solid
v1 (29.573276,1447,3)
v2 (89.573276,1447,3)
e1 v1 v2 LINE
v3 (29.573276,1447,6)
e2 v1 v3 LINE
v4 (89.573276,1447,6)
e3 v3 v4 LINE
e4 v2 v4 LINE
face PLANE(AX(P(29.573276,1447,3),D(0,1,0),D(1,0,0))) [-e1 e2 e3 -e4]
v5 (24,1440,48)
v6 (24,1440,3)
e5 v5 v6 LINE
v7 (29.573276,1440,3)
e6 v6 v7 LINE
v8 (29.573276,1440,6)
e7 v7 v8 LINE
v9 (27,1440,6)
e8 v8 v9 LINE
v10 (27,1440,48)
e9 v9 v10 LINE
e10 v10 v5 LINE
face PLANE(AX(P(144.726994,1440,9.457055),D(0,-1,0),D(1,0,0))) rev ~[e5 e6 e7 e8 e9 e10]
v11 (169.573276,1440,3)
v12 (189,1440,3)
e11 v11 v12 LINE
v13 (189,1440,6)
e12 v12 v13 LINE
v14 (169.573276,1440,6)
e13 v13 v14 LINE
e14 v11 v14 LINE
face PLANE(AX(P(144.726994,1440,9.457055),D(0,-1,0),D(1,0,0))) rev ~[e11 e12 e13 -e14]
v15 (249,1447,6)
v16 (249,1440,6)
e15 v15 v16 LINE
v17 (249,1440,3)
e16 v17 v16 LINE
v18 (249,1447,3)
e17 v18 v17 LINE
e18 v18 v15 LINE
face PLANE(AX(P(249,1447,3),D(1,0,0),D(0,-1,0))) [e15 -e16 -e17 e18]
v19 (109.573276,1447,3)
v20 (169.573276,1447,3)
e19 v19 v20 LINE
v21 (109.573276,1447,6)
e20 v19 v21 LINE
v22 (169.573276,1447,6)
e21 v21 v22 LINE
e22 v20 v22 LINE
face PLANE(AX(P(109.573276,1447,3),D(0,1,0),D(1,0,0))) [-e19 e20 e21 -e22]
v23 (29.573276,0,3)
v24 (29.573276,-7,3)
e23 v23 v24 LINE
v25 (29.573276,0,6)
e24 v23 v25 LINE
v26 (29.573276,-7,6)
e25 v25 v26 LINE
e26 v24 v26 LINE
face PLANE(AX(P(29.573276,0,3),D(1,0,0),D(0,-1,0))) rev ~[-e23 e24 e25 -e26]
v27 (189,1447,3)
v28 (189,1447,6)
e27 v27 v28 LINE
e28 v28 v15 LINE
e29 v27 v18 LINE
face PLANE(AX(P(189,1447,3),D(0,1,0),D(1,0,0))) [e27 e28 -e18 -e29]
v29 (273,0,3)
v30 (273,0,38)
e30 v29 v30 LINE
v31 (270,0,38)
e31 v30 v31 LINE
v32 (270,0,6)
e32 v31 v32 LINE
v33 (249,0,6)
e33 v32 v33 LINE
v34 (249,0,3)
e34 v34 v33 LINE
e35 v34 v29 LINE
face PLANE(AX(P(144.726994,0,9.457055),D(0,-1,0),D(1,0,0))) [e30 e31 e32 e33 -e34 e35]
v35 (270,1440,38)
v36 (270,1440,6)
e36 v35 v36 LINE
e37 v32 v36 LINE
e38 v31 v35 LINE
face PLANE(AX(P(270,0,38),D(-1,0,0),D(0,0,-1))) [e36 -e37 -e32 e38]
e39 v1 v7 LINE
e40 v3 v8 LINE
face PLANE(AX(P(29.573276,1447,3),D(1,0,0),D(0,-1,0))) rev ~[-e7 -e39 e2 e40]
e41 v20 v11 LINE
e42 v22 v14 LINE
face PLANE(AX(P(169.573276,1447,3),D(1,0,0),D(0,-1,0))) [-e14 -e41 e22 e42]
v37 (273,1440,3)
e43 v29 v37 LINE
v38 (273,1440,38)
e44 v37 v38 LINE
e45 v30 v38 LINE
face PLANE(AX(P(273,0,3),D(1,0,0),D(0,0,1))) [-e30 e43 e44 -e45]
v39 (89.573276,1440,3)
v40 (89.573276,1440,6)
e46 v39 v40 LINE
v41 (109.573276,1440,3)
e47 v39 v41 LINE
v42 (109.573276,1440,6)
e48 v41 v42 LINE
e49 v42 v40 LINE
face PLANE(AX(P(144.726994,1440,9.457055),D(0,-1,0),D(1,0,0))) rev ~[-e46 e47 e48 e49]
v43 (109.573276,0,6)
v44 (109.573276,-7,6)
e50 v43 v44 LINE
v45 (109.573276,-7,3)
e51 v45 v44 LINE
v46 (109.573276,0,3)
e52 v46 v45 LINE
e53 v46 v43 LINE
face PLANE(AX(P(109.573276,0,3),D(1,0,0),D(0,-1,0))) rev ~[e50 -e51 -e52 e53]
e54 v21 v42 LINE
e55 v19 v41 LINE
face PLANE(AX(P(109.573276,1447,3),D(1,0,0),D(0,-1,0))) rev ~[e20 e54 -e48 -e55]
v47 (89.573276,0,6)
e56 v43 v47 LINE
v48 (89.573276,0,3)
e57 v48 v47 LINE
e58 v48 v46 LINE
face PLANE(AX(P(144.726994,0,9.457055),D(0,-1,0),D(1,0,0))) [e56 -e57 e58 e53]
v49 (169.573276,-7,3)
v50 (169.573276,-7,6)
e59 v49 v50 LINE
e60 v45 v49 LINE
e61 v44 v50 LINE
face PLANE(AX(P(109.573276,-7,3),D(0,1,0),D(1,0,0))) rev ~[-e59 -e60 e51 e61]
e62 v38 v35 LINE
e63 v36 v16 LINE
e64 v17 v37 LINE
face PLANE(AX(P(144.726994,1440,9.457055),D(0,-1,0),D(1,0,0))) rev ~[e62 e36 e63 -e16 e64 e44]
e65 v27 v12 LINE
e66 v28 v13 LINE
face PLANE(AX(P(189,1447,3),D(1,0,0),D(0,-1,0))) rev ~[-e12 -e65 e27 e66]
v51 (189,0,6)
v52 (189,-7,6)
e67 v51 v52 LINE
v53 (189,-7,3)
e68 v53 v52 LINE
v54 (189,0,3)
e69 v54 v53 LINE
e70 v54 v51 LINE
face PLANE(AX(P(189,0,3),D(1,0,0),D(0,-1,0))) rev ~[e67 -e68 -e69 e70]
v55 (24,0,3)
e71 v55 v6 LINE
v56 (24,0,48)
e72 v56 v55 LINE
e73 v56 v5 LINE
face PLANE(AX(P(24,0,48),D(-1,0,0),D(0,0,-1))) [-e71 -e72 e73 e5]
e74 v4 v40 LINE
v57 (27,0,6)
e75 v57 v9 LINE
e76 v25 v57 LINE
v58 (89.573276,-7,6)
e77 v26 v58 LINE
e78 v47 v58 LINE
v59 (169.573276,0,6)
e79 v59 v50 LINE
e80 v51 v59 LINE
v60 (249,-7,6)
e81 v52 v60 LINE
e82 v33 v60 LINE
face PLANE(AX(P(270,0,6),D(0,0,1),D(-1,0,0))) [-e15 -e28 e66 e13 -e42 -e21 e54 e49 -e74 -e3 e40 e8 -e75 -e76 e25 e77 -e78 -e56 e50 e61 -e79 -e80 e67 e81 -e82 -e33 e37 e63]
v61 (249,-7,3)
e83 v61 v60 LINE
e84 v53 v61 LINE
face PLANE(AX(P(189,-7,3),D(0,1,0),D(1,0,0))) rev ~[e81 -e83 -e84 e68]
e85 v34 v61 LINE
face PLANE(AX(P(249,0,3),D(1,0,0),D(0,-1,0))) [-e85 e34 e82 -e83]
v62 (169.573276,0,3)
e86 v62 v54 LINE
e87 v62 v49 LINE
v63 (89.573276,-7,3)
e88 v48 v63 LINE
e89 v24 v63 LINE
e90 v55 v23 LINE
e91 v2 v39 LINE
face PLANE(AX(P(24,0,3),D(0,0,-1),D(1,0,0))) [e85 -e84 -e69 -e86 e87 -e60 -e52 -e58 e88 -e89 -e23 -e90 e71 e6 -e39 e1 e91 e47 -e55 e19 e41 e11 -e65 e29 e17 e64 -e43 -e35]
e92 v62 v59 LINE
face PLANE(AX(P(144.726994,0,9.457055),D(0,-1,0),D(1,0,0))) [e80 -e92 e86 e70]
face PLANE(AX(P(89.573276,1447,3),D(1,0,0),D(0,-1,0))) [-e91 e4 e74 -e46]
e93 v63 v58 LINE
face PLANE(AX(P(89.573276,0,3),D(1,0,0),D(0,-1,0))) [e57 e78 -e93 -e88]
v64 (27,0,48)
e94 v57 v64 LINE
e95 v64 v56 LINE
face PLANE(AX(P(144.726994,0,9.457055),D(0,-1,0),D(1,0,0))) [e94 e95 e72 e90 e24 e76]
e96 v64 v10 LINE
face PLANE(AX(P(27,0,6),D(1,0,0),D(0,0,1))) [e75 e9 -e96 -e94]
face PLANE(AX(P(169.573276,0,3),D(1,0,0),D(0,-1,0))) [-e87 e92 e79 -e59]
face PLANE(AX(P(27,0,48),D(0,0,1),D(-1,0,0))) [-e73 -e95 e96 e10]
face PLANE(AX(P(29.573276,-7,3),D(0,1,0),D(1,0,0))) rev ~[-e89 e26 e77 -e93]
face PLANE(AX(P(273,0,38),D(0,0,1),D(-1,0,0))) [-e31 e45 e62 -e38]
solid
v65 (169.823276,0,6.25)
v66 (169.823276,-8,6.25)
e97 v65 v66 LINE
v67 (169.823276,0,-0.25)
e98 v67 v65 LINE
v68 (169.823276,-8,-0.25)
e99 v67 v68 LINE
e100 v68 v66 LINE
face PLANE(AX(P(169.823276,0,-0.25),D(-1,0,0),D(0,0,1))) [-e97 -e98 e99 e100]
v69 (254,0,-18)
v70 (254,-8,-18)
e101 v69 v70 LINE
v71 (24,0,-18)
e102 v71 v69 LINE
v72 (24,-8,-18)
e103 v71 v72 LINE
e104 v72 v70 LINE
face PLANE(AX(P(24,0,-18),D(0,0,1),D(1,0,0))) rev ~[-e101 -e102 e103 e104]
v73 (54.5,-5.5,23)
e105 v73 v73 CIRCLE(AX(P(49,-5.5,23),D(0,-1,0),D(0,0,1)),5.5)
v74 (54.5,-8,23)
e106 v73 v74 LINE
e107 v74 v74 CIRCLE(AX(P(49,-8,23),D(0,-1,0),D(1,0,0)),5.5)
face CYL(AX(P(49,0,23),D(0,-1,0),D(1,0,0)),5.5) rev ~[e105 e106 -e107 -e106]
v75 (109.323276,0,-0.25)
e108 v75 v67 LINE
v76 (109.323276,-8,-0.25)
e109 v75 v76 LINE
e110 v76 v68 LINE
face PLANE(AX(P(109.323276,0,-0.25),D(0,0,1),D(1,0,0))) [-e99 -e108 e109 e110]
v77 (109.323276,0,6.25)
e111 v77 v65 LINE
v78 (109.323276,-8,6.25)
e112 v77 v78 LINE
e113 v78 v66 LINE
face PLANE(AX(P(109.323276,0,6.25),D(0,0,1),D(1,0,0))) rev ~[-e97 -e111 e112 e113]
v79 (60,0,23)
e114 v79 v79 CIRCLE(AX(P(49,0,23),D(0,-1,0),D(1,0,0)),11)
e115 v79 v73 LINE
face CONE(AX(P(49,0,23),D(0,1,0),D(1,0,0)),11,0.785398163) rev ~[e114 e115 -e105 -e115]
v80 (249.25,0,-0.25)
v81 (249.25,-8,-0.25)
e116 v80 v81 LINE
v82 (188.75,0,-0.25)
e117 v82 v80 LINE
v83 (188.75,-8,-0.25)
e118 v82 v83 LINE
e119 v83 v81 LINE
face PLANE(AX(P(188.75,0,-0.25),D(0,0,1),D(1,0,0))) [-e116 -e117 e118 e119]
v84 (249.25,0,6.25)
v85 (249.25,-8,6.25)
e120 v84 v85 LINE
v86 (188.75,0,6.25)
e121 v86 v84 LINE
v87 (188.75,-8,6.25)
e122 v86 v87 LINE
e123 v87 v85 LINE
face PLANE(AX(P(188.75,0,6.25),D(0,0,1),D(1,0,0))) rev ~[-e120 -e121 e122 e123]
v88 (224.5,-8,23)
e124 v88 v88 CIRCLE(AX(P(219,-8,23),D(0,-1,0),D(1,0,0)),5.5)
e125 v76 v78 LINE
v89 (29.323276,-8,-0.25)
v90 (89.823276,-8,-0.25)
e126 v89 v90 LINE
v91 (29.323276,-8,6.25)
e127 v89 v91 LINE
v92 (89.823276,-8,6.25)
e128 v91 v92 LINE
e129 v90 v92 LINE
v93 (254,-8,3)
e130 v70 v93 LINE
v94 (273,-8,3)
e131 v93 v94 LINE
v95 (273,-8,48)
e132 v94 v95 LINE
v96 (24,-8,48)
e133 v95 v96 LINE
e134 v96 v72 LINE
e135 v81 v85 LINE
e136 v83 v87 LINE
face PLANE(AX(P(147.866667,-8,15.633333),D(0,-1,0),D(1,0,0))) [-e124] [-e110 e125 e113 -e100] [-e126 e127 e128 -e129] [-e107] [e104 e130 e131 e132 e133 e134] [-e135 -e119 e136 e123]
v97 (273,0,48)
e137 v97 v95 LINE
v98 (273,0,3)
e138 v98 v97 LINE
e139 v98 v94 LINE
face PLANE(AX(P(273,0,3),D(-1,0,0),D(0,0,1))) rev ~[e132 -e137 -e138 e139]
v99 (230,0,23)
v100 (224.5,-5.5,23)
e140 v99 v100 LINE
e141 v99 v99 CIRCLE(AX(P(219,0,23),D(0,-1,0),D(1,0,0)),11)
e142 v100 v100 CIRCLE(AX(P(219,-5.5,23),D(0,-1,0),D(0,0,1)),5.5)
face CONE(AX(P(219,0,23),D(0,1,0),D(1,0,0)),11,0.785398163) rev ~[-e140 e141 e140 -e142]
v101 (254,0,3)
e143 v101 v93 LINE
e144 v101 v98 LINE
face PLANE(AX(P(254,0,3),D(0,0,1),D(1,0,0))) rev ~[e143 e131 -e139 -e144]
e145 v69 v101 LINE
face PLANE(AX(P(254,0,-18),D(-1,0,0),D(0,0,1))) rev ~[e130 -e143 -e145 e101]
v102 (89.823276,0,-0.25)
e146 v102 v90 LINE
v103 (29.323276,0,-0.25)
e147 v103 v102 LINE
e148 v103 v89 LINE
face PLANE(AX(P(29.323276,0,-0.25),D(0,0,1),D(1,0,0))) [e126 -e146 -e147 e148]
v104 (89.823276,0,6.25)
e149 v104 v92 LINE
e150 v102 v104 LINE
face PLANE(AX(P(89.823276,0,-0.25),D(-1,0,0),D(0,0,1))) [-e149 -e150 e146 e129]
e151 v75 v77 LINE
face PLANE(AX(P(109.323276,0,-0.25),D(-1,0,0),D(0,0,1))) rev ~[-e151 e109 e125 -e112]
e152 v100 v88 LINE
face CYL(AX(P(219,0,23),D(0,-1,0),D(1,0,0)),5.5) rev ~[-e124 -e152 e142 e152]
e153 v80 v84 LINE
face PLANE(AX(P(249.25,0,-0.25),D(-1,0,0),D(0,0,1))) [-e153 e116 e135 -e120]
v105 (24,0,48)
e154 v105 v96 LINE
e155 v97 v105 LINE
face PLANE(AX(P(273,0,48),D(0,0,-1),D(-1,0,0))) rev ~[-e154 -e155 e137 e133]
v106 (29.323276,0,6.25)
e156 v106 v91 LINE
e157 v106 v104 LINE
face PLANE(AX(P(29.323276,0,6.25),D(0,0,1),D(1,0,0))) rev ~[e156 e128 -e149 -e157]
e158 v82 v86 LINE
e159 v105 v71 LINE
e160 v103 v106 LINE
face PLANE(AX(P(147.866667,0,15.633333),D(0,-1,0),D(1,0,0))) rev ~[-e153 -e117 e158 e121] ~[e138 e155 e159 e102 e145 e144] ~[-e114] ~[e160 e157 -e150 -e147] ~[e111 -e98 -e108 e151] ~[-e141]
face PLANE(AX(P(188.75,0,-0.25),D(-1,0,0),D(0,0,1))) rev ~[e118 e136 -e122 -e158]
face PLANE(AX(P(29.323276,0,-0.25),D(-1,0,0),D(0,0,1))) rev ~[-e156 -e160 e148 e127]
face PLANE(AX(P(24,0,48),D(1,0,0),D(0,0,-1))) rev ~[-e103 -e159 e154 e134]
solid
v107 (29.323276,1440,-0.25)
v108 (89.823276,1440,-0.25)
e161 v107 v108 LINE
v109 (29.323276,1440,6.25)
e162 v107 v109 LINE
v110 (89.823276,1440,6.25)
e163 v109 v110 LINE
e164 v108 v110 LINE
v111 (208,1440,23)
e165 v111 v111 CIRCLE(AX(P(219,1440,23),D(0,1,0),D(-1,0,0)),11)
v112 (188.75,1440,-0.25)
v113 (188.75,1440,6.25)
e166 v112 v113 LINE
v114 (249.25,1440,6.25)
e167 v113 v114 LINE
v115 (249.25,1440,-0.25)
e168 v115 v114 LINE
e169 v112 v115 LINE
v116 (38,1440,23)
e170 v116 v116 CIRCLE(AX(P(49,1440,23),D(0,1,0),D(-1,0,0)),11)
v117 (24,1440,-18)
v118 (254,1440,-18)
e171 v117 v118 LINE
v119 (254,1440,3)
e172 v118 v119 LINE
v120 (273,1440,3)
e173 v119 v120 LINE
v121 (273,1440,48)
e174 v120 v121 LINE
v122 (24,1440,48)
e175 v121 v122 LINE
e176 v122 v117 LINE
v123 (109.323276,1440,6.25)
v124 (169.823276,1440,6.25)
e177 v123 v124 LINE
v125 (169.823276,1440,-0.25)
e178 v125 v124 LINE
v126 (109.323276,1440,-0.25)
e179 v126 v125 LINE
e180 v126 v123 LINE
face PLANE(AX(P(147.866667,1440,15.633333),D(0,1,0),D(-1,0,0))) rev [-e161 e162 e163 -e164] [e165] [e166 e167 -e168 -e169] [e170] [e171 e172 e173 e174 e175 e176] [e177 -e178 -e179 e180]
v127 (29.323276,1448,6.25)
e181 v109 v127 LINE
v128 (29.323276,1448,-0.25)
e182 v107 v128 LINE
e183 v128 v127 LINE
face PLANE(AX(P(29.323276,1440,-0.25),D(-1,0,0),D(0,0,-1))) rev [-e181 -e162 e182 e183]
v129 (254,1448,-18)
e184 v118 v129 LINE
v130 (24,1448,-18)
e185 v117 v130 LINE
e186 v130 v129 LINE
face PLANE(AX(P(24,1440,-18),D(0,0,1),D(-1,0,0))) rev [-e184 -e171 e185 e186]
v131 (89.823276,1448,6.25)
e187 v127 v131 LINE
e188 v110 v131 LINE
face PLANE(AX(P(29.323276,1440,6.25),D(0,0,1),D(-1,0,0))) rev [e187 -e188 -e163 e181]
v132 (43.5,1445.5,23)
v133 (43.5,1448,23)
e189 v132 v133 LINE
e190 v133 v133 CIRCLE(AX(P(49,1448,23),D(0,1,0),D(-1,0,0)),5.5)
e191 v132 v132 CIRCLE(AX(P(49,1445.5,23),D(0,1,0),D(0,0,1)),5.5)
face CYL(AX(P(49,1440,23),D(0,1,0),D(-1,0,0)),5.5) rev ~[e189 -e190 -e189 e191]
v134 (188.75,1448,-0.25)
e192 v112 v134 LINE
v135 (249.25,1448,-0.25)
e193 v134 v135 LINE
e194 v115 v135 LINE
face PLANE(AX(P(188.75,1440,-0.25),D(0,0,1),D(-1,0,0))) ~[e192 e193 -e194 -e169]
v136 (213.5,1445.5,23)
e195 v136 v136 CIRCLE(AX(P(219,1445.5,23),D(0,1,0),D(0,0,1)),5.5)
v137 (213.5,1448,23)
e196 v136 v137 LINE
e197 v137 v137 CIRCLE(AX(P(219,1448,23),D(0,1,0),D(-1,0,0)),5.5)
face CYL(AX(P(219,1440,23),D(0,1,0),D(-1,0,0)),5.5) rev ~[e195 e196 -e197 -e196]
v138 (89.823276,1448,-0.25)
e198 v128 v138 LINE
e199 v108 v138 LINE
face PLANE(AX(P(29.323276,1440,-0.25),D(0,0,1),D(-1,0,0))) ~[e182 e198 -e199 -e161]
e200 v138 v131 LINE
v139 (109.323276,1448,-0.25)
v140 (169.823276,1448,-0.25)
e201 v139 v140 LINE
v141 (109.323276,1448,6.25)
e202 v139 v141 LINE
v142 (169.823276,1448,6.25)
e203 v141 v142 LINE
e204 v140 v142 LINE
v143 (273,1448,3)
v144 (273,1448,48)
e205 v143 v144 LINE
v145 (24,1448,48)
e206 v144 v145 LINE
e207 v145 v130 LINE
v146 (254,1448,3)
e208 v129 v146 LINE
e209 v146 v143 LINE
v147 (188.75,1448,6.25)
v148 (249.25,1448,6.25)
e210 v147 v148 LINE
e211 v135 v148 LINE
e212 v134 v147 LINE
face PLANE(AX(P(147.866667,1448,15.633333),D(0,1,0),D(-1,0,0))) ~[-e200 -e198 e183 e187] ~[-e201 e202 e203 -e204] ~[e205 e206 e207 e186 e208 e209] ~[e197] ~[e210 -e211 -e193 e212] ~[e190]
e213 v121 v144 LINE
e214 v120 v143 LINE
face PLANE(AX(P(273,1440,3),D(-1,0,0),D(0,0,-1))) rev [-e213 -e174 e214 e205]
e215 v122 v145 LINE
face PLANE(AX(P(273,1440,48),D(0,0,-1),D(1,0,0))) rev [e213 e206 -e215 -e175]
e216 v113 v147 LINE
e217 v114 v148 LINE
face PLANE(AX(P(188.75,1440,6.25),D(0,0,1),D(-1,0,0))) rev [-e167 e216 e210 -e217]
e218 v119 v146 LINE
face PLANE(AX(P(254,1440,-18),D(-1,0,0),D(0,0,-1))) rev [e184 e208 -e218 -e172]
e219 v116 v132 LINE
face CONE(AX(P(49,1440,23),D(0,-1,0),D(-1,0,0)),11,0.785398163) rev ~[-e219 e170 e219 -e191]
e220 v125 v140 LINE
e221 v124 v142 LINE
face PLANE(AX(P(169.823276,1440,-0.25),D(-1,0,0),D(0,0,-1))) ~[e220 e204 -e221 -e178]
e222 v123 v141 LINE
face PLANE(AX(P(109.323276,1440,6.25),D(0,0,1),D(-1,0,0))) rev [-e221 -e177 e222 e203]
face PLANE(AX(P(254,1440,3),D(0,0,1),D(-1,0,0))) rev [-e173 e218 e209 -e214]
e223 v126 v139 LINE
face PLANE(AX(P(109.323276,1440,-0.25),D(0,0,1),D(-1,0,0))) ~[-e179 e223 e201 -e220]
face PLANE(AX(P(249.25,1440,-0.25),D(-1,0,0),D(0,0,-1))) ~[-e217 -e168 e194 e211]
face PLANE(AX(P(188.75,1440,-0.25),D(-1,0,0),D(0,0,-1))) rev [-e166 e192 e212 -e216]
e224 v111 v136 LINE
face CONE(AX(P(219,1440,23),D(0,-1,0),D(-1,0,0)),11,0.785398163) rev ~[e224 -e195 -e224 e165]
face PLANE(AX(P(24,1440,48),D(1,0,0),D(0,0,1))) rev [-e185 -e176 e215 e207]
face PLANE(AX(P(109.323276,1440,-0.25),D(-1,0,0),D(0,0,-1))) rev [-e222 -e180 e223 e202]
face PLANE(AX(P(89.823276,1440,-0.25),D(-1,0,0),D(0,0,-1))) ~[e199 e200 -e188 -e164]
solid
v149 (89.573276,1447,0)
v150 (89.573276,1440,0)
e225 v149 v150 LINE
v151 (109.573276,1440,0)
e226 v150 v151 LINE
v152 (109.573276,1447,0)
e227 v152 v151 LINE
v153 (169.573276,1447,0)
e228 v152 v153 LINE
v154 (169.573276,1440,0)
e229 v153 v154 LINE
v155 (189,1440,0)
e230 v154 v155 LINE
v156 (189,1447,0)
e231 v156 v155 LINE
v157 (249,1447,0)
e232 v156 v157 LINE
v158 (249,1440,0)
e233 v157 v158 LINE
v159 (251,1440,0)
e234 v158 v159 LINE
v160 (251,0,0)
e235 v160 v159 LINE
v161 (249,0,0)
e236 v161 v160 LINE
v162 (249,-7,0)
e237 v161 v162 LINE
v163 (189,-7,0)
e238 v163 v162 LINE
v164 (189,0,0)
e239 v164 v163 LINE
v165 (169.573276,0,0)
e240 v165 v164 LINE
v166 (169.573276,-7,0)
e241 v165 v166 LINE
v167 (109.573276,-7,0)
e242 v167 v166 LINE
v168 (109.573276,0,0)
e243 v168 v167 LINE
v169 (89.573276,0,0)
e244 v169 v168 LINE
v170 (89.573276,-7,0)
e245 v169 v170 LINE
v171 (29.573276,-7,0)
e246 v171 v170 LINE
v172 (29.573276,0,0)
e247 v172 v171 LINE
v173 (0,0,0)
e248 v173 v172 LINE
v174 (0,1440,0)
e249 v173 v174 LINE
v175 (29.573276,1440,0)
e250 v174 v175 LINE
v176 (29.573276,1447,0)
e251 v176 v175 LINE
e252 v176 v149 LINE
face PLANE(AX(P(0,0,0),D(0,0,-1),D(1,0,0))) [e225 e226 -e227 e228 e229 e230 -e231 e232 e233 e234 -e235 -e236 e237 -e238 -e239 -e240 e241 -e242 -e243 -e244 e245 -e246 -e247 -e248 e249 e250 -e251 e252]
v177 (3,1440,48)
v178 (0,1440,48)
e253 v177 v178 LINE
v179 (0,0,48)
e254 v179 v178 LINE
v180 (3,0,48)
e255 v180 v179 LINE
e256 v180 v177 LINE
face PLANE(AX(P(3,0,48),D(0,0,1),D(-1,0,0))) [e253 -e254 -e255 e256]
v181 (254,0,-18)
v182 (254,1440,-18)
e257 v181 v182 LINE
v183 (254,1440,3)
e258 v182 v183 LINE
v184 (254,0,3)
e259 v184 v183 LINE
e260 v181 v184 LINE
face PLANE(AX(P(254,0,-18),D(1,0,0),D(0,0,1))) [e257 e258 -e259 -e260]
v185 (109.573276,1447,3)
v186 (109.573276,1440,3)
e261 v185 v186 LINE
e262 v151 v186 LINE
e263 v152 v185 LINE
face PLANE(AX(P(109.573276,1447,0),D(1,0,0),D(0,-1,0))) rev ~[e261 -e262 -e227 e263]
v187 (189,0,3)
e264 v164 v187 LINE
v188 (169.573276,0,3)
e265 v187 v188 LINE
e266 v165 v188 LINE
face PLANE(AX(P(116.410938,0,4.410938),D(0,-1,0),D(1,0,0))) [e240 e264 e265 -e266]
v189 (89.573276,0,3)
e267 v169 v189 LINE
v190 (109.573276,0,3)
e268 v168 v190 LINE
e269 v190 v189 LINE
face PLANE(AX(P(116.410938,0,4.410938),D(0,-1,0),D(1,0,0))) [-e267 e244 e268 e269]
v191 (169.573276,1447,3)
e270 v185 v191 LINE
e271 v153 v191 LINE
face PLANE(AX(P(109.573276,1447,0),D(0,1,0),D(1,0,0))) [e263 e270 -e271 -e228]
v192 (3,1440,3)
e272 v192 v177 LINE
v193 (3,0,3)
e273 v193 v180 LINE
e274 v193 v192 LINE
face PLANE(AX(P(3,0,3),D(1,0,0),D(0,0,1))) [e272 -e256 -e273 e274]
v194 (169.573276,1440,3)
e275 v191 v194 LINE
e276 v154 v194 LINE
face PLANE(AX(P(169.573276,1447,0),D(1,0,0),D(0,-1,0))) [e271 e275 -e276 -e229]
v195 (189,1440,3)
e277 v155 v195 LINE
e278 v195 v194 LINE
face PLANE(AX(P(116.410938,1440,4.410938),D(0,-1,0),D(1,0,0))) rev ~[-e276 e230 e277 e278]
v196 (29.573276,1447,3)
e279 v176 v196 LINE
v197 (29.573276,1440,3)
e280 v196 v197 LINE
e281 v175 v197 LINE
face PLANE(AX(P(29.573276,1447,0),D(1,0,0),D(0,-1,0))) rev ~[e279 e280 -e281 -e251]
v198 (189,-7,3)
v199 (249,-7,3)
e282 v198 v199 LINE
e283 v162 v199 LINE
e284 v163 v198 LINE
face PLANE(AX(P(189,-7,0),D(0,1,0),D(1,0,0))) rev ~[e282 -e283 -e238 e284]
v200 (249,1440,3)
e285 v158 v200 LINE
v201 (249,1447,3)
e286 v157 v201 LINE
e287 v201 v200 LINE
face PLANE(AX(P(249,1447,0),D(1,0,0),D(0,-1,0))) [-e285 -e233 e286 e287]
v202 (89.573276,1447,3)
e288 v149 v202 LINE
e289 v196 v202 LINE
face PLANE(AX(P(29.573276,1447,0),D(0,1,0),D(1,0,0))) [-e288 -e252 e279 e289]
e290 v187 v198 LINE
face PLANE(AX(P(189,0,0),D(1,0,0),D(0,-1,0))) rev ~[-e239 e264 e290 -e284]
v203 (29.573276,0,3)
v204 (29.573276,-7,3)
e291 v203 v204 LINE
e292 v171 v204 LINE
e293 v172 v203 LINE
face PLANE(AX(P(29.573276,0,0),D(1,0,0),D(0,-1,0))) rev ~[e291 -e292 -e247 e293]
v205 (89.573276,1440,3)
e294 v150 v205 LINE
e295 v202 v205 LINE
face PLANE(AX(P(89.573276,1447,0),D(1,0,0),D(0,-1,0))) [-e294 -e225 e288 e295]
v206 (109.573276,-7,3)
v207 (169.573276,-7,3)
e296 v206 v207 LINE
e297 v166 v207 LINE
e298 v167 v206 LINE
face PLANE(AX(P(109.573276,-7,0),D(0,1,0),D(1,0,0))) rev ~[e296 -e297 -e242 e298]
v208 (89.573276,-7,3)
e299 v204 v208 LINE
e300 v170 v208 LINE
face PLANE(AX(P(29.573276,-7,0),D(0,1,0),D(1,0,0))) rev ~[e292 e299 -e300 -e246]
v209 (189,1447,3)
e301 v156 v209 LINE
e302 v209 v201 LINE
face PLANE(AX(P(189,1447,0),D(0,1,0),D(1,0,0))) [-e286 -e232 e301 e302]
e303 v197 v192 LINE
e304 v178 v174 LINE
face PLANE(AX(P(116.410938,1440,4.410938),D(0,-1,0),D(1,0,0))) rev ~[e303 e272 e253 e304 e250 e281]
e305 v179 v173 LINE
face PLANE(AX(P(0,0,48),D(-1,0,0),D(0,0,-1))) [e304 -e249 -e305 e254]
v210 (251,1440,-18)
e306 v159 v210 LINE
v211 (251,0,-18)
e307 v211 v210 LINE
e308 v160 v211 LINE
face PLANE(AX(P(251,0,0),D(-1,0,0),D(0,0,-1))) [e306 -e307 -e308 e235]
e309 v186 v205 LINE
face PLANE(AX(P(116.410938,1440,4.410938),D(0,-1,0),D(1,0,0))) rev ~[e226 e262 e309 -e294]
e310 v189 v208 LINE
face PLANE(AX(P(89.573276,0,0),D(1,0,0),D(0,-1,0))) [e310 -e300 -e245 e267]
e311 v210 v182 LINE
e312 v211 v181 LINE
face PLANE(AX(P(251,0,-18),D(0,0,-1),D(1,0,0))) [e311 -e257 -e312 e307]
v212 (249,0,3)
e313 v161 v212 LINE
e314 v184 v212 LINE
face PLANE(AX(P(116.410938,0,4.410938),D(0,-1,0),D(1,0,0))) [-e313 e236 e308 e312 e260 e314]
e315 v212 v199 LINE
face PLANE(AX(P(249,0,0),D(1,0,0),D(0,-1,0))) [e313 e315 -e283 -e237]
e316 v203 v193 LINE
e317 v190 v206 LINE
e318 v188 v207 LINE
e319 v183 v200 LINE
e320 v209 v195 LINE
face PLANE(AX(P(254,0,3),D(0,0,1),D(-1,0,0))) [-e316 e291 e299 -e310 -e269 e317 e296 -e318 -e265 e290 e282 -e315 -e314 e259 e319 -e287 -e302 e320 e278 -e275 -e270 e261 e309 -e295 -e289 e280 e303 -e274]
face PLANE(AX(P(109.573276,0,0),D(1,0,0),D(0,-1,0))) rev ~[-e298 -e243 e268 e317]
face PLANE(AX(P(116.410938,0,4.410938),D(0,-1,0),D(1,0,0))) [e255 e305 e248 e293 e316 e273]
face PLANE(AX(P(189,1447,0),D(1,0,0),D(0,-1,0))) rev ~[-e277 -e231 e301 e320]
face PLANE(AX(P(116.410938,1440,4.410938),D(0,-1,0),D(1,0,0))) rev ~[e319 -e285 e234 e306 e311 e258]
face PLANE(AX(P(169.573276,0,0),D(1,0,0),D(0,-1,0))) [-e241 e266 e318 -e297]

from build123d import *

# Parameters (mm, degrees)
F1_DEPTH        = 1440
F2_DEPTH        = 1440
F3_W            = 60
F3_H            = 7
F4_DEPTH        = 3
F6_W            = 60
F6_H            = 7
F7_DEPTH        = 3
F8_W            = 60.5
F8_H            = 6.5
F9_DEPTH        = 8
F12_D           = 11
F12_CSINK_D     = 22
F12_CSINK_ANGLE = 90
F14_D           = 11
F14_CSINK_D     = 22
F14_CSINK_ANGLE = 90


with BuildPart() as f1:
    # F0 (on Front) → F1 (new body)
    with BuildSketch(Plane.XZ):
        Polygon((3, 48), (0, 48), (0, 0), (251, 0), (251, -18), (254, -18), (254, 3), (24, 3), (3, 3), align=None)
    extrude(amount=-F1_DEPTH)

    # F6 (on face) → F7 (join)
    with BuildSketch(Plane(origin=(0, 0, 0), x_dir=(1, 0, 0), z_dir=(0, 0, -1))):
        with Locations((219, 3.5)):
            Rectangle(F6_W, F6_H)
        with Locations((139.5732760429, 3.5)):
            Rectangle(F6_W, F6_H)
        with Locations((59.5732760429, 3.5)):
            Rectangle(F6_W, F6_H)
        with Locations((219, -1443.5)):
            Rectangle(F6_W, F6_H)
        with Locations((59.5732760429, -1443.5)):
            Rectangle(F6_W, F6_H)
        with Locations((139.5732760429, -1443.5)):
            Rectangle(F6_W, F6_H)
    extrude(amount=-F7_DEPTH)


with BuildPart() as f2:
    # F0 (on Front) → F2 (new body)
    with BuildSketch(Plane.XZ):
        Polygon((24, 48), (24, 3), (254, 3), (273, 3), (273, 6), (273, 38), (270, 38), (270, 6), (27, 6), (27, 48), align=None)
    extrude(amount=-F2_DEPTH)

    # F3 (on face) → F4 (join)
    with BuildSketch(Plane(origin=(0, 0, 3), x_dir=(1, 0, 0), z_dir=(0, 0, -1))):
        with Locations((59.5732760429, 3.5)):
            Rectangle(F3_W, F3_H)
        with Locations((139.5732760429, 3.5)):
            Rectangle(F3_W, F3_H)
        with Locations((219, 3.5)):
            Rectangle(F3_W, F3_H)
        with Locations((219, -1443.5)):
            Rectangle(F3_W, F3_H)
        with Locations((59.5732760429, -1443.5)):
            Rectangle(F3_W, F3_H)
        with Locations((139.5732760429, -1443.5)):
            Rectangle(F3_W, F3_H)
    extrude(amount=-F4_DEPTH)


with BuildPart() as f9:
    # F8 (on face) → F9 (new body)
    with BuildSketch(Plane.XZ):
        Polygon((254, 3), (273, 3), (273, 48), (24, 48), (24, -18), (254, -18), align=None)
        with Locations((59.5732760429, 3)):
            Rectangle(F8_W, F8_H, mode=Mode.SUBTRACT)
        with Locations((139.5732760429, 3)):
            Rectangle(F8_W, F8_H, mode=Mode.SUBTRACT)
        with Locations((219, 3)):
            Rectangle(F8_W, F8_H, mode=Mode.SUBTRACT)
    extrude(amount=F9_DEPTH)


with BuildPart() as f10_1:
    # F10: instance of F9
    add(f9.part.mirror(Plane.XZ.offset(-720)))

    # F14 (through all)
    with Locations(Plane.XZ.offset(-1440)):
        with Locations((49, 23), (219, 23)):
            CounterSinkHole(F14_D / 2, F14_CSINK_D / 2, counter_sink_angle=F14_CSINK_ANGLE)


with BuildPart() as f9_1:
    add(f9.part)

    # F12 (through all)
    with Locations(Plane(origin=(0, 0, 0), x_dir=(-1, 0, 0), z_dir=(0, 1, 0))):
        with Locations((-49, 23), (-219, 23)):
            CounterSinkHole(F12_D / 2, F12_CSINK_D / 2, counter_sink_angle=F12_CSINK_ANGLE)


solid = Compound([f1.part, f2.part, f10_1.part, f9_1.part])
